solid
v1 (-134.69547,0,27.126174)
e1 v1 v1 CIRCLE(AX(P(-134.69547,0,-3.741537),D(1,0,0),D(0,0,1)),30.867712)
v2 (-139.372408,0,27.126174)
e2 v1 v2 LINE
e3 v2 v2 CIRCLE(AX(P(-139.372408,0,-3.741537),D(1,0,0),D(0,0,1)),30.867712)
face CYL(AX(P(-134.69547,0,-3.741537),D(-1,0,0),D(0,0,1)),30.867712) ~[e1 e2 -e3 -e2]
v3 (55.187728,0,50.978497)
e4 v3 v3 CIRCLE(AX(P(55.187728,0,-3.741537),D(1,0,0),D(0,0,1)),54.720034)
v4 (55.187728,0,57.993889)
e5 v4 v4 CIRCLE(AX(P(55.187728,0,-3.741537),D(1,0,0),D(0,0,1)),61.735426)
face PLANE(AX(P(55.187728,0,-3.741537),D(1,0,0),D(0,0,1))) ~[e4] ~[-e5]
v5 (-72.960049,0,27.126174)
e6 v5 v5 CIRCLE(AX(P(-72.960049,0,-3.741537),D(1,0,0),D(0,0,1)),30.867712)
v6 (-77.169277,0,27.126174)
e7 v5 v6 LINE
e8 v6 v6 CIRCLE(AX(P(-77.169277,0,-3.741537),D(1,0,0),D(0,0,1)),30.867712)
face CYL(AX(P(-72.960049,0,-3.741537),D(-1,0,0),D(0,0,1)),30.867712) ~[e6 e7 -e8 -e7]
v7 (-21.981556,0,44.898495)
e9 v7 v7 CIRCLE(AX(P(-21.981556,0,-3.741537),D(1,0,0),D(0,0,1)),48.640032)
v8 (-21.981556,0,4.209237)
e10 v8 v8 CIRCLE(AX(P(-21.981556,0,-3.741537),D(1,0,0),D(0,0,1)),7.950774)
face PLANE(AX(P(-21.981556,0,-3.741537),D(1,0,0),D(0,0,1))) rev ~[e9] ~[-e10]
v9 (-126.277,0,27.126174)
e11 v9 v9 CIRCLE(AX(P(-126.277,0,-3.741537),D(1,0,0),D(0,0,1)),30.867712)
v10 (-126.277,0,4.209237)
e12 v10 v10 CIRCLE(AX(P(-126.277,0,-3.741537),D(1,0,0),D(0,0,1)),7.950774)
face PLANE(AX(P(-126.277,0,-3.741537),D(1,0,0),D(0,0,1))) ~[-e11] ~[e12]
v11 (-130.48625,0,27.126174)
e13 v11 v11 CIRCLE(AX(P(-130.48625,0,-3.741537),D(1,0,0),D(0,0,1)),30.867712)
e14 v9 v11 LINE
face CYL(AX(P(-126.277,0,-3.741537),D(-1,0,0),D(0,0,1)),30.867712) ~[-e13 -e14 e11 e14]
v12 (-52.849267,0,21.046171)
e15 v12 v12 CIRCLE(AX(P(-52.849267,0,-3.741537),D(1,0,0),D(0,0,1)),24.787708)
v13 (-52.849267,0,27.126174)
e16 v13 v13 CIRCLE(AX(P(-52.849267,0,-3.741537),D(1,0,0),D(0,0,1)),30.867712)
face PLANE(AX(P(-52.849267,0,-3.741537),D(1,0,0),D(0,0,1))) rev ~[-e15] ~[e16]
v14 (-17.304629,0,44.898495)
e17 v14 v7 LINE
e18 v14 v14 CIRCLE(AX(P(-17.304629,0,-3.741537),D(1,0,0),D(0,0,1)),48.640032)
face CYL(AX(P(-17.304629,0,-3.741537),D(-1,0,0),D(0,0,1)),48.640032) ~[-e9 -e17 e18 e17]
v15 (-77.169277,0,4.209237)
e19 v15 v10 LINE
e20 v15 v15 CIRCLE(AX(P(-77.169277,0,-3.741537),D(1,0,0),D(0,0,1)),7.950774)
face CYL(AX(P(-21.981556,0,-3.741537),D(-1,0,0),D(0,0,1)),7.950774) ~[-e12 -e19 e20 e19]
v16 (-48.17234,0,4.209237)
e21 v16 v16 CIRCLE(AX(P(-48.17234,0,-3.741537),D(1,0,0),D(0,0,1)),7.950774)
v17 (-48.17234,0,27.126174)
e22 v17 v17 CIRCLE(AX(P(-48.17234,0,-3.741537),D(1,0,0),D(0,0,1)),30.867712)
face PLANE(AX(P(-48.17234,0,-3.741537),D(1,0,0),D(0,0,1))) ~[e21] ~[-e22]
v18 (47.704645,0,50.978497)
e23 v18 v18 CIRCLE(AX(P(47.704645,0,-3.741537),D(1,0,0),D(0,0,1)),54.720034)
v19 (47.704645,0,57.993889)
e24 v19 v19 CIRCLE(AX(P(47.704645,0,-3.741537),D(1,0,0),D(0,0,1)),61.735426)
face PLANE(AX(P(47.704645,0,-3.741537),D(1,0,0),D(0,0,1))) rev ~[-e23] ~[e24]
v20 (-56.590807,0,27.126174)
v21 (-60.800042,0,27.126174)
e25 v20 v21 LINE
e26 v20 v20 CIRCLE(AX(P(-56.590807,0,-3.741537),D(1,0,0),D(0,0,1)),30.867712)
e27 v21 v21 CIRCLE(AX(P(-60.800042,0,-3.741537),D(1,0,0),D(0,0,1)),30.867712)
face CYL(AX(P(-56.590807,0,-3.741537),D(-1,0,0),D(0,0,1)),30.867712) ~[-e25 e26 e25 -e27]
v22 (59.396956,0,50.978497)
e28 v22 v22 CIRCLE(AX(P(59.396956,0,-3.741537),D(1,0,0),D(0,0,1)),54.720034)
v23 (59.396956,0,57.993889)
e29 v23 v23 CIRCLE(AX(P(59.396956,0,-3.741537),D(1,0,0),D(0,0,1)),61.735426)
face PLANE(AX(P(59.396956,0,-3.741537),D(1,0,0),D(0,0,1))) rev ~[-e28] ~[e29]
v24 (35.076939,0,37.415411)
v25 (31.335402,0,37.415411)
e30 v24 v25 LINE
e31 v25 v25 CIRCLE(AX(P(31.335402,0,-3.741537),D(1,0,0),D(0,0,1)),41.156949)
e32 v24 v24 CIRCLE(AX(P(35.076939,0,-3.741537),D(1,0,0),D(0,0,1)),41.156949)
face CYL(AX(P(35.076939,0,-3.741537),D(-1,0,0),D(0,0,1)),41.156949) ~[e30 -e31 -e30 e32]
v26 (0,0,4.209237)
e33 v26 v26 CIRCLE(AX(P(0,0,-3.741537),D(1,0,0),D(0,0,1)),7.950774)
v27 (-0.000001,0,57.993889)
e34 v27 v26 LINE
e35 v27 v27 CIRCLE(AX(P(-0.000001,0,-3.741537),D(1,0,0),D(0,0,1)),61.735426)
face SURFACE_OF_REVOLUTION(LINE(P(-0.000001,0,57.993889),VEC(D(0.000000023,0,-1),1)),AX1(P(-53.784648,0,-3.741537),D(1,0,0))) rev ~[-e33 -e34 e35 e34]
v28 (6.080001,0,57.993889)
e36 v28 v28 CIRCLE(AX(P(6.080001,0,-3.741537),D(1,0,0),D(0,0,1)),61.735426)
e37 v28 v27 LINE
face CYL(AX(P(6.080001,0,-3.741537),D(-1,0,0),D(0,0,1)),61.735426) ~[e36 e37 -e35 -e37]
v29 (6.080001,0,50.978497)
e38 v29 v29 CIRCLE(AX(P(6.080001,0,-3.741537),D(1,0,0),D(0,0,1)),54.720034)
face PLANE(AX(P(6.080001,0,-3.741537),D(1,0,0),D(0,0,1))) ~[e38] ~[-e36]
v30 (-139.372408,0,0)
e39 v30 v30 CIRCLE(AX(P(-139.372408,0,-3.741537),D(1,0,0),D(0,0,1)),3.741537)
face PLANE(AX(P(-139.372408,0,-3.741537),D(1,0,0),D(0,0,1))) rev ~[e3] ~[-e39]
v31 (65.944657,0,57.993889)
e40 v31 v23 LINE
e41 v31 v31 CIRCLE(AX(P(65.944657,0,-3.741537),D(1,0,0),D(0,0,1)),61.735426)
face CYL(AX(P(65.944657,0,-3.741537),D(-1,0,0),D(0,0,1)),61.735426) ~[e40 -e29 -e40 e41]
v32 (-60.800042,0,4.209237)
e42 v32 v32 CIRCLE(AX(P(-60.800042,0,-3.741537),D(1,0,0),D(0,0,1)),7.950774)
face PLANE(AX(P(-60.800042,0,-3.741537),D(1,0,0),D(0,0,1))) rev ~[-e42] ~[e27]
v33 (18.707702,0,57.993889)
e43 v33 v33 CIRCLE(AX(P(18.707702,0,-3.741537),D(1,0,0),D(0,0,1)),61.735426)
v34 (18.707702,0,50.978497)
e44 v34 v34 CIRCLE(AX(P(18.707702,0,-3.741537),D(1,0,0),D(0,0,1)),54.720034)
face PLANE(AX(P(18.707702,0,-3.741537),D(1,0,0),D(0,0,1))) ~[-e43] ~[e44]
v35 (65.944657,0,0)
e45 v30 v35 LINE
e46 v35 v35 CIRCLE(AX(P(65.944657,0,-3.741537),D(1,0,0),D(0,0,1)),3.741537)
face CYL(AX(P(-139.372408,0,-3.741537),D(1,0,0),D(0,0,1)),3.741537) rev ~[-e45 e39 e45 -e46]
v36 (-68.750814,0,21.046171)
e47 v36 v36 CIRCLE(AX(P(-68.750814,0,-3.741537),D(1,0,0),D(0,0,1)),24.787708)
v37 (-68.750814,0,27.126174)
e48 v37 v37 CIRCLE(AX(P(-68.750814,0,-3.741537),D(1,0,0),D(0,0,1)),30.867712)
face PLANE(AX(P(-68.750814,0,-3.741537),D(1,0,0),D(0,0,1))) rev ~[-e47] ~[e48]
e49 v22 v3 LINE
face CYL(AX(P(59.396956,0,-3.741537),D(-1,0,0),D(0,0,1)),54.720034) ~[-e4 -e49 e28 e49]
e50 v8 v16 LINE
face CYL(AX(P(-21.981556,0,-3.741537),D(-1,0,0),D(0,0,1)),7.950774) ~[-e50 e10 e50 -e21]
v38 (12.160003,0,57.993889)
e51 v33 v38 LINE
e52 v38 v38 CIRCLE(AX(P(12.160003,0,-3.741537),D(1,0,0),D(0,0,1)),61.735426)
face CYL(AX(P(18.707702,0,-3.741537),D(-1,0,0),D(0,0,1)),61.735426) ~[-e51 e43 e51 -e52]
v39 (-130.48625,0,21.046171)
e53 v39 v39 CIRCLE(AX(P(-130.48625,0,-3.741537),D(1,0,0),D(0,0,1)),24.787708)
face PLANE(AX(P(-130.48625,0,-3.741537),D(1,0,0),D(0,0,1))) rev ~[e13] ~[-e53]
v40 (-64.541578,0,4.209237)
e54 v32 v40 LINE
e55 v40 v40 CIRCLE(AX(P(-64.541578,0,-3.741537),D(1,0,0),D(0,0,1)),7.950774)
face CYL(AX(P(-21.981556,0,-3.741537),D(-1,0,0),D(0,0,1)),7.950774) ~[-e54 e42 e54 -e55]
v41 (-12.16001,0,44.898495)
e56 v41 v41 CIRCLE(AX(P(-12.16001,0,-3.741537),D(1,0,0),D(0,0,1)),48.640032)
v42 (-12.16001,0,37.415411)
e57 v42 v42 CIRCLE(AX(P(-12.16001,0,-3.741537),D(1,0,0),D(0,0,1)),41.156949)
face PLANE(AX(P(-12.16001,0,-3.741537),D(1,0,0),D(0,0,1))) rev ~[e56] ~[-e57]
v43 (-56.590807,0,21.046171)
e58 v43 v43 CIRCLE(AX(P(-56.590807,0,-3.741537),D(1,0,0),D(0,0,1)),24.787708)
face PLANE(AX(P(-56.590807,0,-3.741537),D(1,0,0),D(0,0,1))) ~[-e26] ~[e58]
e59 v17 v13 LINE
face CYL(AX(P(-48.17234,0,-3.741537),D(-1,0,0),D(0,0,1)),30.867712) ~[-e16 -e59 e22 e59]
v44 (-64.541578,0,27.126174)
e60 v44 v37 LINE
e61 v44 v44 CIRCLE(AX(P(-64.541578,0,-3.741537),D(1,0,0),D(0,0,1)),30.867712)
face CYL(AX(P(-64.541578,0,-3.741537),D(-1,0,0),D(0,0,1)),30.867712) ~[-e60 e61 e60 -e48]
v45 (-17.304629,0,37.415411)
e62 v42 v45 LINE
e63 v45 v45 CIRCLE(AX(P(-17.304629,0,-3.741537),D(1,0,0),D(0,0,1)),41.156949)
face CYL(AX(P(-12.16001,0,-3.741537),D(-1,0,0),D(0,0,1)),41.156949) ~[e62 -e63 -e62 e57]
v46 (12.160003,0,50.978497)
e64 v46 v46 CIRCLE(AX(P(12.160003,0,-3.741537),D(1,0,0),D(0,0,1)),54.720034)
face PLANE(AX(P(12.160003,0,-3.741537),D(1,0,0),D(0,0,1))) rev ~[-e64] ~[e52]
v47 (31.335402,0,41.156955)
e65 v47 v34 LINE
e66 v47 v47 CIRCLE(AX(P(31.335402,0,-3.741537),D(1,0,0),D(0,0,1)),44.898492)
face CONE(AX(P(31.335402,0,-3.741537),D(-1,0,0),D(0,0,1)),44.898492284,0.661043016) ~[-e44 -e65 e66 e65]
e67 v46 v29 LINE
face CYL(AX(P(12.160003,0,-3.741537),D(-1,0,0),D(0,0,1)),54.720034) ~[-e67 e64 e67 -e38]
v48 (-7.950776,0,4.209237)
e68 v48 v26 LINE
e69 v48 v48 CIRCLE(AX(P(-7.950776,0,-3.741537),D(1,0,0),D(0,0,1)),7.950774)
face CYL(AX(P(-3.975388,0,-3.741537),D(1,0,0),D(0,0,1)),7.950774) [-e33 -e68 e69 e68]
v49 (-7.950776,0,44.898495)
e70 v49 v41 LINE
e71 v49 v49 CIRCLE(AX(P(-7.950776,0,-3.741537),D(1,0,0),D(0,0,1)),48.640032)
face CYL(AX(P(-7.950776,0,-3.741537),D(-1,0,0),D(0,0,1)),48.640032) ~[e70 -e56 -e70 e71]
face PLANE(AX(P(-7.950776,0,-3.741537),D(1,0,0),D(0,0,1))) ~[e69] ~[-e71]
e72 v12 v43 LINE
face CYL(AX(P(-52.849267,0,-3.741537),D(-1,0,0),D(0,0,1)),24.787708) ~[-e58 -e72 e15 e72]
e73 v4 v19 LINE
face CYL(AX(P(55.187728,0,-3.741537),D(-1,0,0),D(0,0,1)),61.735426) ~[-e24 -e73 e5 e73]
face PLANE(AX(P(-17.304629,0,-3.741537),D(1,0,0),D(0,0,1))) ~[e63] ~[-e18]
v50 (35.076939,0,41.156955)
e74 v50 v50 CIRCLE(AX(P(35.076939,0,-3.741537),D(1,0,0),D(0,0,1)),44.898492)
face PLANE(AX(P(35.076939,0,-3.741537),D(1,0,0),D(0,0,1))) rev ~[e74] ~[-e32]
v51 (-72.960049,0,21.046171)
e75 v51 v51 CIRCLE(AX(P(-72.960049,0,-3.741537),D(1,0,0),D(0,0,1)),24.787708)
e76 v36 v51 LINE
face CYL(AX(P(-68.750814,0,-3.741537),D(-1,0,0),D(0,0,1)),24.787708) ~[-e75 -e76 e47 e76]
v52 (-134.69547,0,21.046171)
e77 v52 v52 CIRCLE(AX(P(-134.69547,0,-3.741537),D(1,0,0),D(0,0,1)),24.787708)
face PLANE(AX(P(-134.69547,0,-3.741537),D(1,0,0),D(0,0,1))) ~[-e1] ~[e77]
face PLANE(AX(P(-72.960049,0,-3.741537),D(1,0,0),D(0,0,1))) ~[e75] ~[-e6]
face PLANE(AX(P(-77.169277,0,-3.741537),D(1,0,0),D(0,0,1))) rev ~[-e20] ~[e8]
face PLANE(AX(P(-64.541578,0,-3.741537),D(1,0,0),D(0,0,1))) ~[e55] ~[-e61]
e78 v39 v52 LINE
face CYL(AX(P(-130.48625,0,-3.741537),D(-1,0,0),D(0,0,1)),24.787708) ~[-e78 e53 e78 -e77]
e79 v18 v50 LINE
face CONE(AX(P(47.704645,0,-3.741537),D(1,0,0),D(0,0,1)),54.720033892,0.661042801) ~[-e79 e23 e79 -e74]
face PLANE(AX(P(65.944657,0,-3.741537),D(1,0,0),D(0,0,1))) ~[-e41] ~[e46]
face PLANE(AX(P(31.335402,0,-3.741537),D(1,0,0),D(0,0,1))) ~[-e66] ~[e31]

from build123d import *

# Parameters (mm, degrees)
F0_W   = 26.1907838285
F0_H   = 4.2092371732
F0_W_2 = 7.9507762566
F0_W_3 = 3.7415362895
F0_W_4 = 12.6277022064
F0_W_5 = 12.6276984811
F0_W_6 = 49.1077229381
F0_W_7 = 14.0307797119


# Not quite as in the source:
# - ends of sketch curves that miss each other by under 0.0002 mm in the source are joined
# - the program builds the solid bodies; features that only make, move or delete a surface that nothing else refers to are left out


with BuildPart() as f1:
    # F0 (on Front) → F1 (revolve)
    with BuildSketch(Plane.XZ):
        with Locations((-35.0769478828, 2.1046185866)):
            Rectangle(F0_W, F0_H)
        with Locations((-3.9753881283, 2.1046185866)):
            Rectangle(F0_W_2, F0_H)
        with Locations((-62.6708101481, 2.1046185866)):
            Rectangle(F0_W_3, F0_H)
        with Locations((-54.4861909002, 2.1046185866)):
            Rectangle(F0_W_4, F0_H)
        with Locations((-70.8554275334, 2.1046185866)):
            Rectangle(F0_W_5, F0_H)
        with Locations((-101.723138243, 2.1046185866)):
            Rectangle(F0_W_6, F0_H)
        Polygon((-21.9815559685, 44.8984950781), (-21.9815559685, 4.2092371732), (-7.9507762566, 4.2092371732), (-7.9507762566, 44.8984950781), (-12.1600097045, 44.8984950781), (-12.1600097045, 37.4154113233), (-17.3046290874, 37.4154113233), (-17.3046290874, 44.8984950781), align=None)
        with Locations((-14.9661661126, 2.1046185866)):
            Rectangle(F0_W_7, F0_H)
        Polygon((-60.8000420034, 27.1261744201), (-60.8000420034, 4.2092371732), (-48.172339797, 4.2092371732), (-48.172339797, 27.1261744201), (-52.8492666781, 27.1261744201), (-52.8492666781, 21.0461709648), (-56.5908066928, 21.0461709648), (-56.5908066928, 27.1261744201), align=None)
        Polygon((-77.1692767739, 27.1261744201), (-77.1692767739, 4.2092371732), (-64.5415782928, 4.2092371732), (-64.5415782928, 27.1261744201), (-68.7508136034, 27.1261744201), (-68.7508136034, 21.0461709648), (-72.960048914, 21.0461709648), (-72.960048914, 27.1261744201), align=None)
        Polygon((-139.37240839, 27.1261744201), (-139.37240839, 0), (-126.276999712, 0), (-126.276999712, 4.2092371732), (-126.276999712, 27.1261744201), (-130.4862499237, 27.1261744201), (-130.4862499237, 21.0461709648), (-134.6954703331, 21.0461709648), (-134.6954703331, 27.1261744201), align=None)
        Polygon((0, 4.2092371732), (0, 0), (35.0769385695, 0), (35.0769385695, 37.4154113233), (31.3354022801, 37.4154113233), (31.3354022801, 41.1569550633), (18.7077019364, 50.9784966707), (18.7077019364, 57.993888855), (12.1600031853, 57.993888855), (12.1600031853, 50.9784966707), (6.080001127, 50.9784966707), (6.080001127, 57.993888855), (-1.2167e-06, 57.993888855), align=None)
        Polygon((35.0769385695, 37.4154113233), (35.0769385695, 0), (65.9446567297, 0), (65.9446567297, 50.9784966707), (65.9446567297, 57.993888855), (59.396956116, 57.993888855), (59.396956116, 50.9784966707), (55.187728256, 50.9784966707), (55.187728256, 57.993888855), (47.7046445012, 57.993888855), (47.7046445012, 50.9784966707), (35.0769385695, 41.1569550633), align=None)
    revolve(axis=Axis((-53.7846479565, 0, -3.7415372208), (1, 0, 0)))


solid = f1.part
